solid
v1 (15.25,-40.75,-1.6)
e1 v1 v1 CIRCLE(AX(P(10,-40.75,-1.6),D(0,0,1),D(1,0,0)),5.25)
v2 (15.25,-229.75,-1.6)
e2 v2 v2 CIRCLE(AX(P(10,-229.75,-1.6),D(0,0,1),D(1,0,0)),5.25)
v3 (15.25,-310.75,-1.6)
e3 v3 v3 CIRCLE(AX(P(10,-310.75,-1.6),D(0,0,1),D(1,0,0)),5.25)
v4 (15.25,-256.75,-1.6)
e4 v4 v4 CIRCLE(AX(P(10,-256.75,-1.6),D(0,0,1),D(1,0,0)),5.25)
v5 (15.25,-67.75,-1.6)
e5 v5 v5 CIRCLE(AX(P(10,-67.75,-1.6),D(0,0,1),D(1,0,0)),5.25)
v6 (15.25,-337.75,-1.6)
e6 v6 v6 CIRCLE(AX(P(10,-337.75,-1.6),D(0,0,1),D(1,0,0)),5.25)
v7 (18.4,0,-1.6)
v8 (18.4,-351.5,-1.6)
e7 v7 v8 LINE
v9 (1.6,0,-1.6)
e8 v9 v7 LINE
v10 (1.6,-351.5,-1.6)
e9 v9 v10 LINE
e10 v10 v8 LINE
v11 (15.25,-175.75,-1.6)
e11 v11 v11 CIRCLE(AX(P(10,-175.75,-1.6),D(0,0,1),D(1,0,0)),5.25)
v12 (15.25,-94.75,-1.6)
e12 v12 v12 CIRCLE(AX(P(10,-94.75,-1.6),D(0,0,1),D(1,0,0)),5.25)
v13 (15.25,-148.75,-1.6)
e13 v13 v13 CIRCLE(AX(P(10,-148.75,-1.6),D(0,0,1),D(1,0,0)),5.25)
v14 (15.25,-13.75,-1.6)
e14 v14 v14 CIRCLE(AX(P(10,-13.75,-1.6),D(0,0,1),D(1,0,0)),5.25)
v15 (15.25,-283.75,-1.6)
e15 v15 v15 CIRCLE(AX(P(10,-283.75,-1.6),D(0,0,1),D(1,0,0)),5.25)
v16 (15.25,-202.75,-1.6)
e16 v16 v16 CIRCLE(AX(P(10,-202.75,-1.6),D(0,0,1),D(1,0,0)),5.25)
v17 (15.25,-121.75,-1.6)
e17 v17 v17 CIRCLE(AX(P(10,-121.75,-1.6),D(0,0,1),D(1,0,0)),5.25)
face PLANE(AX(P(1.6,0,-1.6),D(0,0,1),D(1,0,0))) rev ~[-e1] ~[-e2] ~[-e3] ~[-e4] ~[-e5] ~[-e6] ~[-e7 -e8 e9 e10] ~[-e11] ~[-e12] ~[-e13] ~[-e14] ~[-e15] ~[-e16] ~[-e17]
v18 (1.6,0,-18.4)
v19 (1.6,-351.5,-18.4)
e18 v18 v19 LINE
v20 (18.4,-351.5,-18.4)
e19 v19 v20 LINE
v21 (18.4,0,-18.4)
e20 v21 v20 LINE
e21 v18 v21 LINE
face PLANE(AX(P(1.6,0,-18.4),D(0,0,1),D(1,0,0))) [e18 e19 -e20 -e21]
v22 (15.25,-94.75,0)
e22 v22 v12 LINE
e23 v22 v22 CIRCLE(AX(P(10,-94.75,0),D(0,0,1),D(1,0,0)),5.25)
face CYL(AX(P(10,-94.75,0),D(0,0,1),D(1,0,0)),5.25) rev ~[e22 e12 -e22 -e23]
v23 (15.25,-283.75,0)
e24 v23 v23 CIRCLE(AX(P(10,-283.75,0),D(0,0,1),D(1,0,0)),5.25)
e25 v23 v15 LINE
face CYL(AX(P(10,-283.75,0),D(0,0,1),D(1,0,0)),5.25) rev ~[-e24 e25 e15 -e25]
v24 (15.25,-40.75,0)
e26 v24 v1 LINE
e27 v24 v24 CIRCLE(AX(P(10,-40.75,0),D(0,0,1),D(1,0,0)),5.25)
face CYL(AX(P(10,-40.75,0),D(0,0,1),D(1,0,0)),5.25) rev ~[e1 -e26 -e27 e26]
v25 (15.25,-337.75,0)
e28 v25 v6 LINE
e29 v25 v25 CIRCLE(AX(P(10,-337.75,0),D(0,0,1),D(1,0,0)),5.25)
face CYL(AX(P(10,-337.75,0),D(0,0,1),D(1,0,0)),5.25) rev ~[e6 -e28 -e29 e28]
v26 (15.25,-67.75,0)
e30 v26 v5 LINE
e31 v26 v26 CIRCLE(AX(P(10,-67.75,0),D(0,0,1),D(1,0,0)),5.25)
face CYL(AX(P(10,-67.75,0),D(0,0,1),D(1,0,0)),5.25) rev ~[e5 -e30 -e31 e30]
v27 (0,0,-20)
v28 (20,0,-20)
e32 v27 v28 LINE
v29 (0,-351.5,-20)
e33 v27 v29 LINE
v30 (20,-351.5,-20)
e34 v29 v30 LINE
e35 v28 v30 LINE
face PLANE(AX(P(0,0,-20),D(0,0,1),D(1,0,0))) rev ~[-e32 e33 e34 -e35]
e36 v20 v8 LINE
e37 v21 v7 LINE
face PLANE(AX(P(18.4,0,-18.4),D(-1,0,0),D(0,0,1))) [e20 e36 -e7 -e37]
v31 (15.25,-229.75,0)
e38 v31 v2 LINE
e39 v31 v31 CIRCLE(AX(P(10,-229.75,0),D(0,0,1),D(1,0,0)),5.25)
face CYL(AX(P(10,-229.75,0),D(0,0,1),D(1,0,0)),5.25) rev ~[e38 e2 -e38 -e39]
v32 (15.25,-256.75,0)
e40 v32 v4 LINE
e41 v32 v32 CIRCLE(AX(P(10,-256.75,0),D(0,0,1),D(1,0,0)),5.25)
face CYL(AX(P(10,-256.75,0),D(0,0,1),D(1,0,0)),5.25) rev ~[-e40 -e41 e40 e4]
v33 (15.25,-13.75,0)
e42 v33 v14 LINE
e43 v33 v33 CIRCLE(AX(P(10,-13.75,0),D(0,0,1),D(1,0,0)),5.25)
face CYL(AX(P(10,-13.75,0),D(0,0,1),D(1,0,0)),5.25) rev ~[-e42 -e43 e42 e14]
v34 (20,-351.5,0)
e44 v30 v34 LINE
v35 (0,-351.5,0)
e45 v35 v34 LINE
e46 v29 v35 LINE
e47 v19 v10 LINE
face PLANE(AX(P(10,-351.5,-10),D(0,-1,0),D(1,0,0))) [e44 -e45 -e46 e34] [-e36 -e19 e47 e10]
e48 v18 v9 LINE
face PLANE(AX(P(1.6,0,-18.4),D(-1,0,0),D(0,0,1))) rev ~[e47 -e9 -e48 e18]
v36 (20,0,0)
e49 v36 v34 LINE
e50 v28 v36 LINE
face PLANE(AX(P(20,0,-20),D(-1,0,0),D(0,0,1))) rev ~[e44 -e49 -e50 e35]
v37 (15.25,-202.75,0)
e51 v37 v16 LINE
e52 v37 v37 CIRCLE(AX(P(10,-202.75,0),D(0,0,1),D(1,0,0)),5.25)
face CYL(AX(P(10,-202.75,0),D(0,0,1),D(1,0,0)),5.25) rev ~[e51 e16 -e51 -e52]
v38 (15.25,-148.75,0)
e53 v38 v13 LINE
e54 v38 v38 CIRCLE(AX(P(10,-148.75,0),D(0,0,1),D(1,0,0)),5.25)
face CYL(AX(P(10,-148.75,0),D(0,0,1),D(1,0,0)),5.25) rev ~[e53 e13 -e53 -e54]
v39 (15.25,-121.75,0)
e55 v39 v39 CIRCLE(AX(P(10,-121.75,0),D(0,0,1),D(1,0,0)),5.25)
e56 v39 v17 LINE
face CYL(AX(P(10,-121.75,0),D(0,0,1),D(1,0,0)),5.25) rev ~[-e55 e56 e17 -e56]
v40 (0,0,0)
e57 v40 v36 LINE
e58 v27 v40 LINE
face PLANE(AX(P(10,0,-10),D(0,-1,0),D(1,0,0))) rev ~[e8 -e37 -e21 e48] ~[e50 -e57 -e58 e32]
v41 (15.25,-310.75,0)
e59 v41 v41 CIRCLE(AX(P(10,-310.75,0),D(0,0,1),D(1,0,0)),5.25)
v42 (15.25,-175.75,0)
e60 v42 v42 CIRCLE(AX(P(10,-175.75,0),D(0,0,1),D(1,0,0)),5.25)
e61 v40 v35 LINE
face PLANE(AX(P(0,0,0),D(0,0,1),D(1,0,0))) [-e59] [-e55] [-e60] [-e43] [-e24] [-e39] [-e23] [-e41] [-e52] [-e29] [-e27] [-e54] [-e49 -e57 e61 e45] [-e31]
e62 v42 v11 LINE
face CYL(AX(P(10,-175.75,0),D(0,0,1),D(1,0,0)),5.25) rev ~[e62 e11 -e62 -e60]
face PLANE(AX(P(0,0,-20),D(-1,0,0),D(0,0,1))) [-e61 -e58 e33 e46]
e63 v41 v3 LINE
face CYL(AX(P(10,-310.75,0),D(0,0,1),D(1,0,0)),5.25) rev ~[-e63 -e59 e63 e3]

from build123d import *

# Parameters (mm, degrees)
F0_W     = 20
F0_H     = 20
F0_W_2   = 16.8
F0_H_2   = 16.8
F1_DEPTH = 351.5
F2_R     = 5.25
F3_DEPTH = 5


# Not quite as in the source:
# - a feature names something its author has since deleted; it is built from what else it names


with BuildPart() as f1:
    # F0 (on Front) → F1 (new body)
    with BuildSketch(Plane.XZ):
        with Locations((10, -10)):
            Rectangle(F0_W, F0_H)
        with Locations((10, -10)):
            Rectangle(F0_W_2, F0_H_2, mode=Mode.SUBTRACT)
    extrude(amount=F1_DEPTH)

    # F2 (on face) → F3 (cut)
    with BuildSketch(Plane.XY):
        with Locations((10, -310.75)):
            Circle(F2_R)
        with Locations((10, -283.75)):
            Circle(F2_R)
        with Locations((10, -256.75)):
            Circle(F2_R)
        with Locations((10, -229.75)):
            Circle(F2_R)
        with Locations((10, -202.75)):
            Circle(F2_R)
        with Locations((10, -175.75)):
            Circle(F2_R)
        with Locations((10, -148.75)):
            Circle(F2_R)
        with Locations((10, -121.75)):
            Circle(F2_R)
        with Locations((10, -94.75)):
            Circle(F2_R)
        with Locations((10, -67.75)):
            Circle(F2_R)
        with Locations((10, -40.75)):
            Circle(F2_R)
        with Locations((10, -13.75)):
            Circle(F2_R)
        with Locations((10, -337.75)):
            Circle(F2_R)
    extrude(amount=-F3_DEPTH, mode=Mode.SUBTRACT)


solid = f1.part
